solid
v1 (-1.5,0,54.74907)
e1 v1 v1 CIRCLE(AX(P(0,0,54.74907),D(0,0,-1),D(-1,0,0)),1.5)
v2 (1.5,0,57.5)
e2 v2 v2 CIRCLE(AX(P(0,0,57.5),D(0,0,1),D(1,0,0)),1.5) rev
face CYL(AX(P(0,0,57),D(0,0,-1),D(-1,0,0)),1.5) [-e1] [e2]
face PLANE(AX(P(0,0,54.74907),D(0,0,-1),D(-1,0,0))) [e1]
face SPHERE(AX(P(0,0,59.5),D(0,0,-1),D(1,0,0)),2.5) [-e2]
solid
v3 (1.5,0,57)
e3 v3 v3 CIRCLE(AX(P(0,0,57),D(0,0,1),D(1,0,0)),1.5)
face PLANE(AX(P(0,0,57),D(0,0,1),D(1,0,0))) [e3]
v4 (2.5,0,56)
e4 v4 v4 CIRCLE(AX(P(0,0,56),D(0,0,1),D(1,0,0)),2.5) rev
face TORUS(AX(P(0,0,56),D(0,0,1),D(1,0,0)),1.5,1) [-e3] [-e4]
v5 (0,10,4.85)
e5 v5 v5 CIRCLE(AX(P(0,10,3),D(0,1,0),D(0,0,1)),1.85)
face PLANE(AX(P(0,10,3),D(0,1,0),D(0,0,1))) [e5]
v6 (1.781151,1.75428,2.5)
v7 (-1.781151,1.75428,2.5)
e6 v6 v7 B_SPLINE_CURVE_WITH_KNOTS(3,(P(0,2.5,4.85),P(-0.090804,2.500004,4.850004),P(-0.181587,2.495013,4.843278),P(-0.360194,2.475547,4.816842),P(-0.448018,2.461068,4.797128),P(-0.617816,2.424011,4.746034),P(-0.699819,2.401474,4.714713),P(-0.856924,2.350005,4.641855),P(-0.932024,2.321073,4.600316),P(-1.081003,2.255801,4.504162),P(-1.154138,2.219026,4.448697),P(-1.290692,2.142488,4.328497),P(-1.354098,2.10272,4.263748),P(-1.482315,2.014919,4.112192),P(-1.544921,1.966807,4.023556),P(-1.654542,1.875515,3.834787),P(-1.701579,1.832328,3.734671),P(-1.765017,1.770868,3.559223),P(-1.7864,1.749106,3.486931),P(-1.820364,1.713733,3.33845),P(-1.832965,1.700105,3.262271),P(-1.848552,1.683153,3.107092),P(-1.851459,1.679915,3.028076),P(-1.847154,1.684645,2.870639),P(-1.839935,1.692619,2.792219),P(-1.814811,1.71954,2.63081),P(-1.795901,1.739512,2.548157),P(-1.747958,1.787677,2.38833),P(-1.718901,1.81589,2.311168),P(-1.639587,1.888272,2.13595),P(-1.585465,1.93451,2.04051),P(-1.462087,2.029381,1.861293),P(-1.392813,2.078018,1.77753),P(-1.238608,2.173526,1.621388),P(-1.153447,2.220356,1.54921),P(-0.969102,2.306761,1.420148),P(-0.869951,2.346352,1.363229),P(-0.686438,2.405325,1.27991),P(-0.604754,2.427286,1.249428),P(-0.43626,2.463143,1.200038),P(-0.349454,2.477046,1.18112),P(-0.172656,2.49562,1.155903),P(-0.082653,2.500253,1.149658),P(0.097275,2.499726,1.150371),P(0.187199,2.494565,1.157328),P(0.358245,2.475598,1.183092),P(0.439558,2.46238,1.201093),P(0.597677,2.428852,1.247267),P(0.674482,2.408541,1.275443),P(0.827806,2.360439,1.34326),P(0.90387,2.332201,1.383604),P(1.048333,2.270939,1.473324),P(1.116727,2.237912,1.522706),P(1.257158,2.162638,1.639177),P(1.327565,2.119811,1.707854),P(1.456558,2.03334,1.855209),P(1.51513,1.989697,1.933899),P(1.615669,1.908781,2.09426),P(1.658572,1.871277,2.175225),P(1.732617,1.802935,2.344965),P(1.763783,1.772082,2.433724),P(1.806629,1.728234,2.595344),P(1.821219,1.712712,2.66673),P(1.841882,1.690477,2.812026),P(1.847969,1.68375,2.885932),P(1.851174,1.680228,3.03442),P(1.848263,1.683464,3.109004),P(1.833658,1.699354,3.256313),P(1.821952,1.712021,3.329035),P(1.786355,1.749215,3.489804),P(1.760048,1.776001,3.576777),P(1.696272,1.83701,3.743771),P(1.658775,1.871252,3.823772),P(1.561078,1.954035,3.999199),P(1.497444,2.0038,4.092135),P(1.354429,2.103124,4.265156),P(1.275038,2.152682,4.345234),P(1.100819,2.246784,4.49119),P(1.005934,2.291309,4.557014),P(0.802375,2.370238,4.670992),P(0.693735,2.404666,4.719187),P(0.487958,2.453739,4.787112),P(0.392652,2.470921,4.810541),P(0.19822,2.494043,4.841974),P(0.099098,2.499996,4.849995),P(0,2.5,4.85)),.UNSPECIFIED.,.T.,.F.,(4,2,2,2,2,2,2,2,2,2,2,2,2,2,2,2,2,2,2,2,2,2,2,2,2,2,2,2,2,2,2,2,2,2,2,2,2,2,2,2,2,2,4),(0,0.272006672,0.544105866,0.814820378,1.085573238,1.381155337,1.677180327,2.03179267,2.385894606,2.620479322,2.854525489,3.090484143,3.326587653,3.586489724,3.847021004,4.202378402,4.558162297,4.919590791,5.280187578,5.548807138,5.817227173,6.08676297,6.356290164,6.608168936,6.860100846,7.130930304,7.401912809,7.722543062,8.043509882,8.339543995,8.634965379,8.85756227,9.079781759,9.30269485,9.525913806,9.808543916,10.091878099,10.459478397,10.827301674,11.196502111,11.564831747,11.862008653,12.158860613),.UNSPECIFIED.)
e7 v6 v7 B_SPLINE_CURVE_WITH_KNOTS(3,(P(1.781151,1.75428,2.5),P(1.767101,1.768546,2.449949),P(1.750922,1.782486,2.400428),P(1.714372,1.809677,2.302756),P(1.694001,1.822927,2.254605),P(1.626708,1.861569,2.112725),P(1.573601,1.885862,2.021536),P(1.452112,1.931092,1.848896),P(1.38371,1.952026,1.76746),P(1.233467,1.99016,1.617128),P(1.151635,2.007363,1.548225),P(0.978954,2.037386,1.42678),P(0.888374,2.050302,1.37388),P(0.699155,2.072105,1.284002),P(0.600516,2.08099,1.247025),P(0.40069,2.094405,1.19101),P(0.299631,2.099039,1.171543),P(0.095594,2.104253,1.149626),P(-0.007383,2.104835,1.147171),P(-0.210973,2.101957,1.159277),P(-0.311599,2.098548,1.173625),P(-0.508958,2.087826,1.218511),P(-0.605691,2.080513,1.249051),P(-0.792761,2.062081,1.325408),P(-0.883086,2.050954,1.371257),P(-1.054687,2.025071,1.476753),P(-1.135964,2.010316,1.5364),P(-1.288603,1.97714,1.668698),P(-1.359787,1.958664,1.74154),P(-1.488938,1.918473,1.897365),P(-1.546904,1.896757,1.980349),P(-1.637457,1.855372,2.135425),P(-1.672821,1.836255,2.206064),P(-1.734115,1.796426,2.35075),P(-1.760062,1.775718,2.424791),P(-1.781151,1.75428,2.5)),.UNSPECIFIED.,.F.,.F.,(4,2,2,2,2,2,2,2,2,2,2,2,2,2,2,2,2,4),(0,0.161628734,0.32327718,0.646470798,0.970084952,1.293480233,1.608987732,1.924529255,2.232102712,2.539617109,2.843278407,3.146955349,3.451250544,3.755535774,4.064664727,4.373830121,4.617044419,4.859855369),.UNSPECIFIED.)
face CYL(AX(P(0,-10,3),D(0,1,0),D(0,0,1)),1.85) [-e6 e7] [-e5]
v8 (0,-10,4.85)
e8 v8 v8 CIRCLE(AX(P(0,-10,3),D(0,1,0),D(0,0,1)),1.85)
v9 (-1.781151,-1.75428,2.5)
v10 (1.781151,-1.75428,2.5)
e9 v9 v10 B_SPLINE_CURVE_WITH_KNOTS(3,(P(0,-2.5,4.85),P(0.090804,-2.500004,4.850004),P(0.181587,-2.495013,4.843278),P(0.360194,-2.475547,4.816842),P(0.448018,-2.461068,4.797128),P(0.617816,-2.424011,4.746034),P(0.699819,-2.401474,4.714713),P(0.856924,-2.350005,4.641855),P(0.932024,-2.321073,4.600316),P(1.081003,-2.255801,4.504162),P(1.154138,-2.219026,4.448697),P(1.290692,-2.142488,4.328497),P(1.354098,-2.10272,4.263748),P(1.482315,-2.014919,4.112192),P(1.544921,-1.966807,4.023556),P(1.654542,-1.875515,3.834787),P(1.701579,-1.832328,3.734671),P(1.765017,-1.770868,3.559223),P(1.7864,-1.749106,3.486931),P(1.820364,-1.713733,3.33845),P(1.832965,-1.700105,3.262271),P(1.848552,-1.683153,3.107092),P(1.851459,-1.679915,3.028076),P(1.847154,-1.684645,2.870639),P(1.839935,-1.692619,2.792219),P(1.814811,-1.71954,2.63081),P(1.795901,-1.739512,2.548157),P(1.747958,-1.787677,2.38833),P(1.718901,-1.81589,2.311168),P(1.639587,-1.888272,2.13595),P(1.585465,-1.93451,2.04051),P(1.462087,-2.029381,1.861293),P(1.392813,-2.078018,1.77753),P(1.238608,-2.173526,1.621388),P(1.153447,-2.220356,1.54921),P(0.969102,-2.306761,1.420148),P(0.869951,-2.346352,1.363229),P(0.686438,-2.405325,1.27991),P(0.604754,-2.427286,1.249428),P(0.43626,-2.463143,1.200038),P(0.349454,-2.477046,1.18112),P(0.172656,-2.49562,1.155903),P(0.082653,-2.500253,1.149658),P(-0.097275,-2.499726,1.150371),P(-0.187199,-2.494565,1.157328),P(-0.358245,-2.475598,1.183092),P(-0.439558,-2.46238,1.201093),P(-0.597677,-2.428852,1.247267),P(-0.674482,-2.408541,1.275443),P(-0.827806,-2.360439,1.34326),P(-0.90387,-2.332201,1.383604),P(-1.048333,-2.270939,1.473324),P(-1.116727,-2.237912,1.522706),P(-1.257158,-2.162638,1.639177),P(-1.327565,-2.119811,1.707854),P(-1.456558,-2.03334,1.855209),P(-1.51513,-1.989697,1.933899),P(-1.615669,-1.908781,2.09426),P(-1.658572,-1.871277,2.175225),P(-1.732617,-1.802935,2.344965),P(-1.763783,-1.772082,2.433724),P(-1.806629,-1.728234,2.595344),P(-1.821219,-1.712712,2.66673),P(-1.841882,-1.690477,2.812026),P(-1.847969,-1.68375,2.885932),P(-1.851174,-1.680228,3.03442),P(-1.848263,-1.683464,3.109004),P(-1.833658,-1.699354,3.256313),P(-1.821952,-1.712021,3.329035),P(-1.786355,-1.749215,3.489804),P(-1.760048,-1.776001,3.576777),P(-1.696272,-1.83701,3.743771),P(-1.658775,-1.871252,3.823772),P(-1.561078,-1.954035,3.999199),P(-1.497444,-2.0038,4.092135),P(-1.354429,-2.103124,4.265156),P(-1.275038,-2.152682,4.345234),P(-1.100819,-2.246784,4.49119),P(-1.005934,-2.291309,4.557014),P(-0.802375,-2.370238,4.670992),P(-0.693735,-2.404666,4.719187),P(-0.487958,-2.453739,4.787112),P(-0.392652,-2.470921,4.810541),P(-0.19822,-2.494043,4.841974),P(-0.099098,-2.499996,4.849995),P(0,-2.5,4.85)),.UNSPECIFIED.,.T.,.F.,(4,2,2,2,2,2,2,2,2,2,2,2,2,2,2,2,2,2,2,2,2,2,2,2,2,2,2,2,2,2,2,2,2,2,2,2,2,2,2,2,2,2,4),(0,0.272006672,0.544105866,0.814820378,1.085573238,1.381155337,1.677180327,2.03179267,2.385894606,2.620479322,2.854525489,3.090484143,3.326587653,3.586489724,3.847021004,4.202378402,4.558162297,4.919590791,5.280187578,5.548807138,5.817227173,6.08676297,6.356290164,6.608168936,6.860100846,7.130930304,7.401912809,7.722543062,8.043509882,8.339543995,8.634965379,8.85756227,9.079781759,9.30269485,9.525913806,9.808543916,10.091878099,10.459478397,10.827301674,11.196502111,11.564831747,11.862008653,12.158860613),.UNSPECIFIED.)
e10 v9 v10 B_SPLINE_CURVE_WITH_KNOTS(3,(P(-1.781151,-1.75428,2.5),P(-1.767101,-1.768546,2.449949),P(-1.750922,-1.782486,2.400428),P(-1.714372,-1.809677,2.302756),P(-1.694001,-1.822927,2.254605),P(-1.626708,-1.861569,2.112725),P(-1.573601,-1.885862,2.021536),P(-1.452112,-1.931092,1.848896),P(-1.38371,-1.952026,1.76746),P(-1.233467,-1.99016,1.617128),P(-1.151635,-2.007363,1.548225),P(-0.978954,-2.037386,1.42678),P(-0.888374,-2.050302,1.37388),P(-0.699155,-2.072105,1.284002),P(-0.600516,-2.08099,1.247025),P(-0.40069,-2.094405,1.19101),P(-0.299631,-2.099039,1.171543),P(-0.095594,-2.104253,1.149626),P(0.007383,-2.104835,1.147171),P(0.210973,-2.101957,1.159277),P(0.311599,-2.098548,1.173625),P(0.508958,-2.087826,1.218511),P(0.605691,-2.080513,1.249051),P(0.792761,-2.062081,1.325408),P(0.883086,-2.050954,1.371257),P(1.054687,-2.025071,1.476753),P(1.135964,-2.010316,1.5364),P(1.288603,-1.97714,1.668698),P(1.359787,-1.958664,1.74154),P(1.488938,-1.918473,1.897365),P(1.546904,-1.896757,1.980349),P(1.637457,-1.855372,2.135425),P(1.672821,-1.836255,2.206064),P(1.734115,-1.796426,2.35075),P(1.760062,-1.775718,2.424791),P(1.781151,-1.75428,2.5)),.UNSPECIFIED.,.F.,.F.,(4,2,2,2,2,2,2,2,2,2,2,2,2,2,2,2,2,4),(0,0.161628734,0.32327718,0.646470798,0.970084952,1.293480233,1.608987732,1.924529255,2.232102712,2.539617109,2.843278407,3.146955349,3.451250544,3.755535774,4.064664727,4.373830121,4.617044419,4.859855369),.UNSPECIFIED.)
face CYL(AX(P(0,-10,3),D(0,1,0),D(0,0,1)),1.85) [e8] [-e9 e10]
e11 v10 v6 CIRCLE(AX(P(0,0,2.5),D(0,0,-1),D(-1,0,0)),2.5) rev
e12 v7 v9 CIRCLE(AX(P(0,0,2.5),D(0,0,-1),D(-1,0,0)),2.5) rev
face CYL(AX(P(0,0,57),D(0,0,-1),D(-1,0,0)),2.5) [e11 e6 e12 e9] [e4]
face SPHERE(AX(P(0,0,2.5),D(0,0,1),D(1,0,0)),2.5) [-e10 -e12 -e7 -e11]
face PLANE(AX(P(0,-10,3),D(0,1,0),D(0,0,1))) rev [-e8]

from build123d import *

# Parameters (mm, degrees)
SKETCH1_R                = 2.5
BOSS_EXTRUDE1_DEPTH      = 57
SKETCH3_W                = 1.5
SKETCH3_H                = 3.627330444
FILLET1_R                = 1
BOSS_EXTRUDE2_DEPTH      = 10
BOSS_EXTRUDE2_DEPTH_BACK = 10
SKETCH4_R                = 1.85
FILLET2_R                = 2.5


with BuildPart() as part:
    # Sketch1 → Boss-Extrude1 (new body)
    with BuildSketch(Plane.XY):
        with Locations(Location((0, 0, 0), (0, 0, 180))):
            Circle(SKETCH1_R)
    extrude(amount=BOSS_EXTRUDE1_DEPTH)

    # Fillet1
    fillet1_edges = [part.edges().sort_by_distance(p)[0] for p in [
        (2.5, 0, 57),
    ]]
    fillet(fillet1_edges, radius=FILLET1_R)

    # Sketch4 → Boss-Extrude2 (add, two sides: drawn at the far end of the back side and taken through both)
    with BuildSketch(Plane(origin=(0, 0, 0), x_dir=(1, 0, 0), z_dir=(0, 1, 0)).offset(-BOSS_EXTRUDE2_DEPTH_BACK)):
        with Locations(Location((0, -3, 0), (0, 0, 270))):
            Circle(SKETCH4_R)
    extrude(amount=BOSS_EXTRUDE2_DEPTH + BOSS_EXTRUDE2_DEPTH_BACK)

    # Fillet2
    # the kernel refuses this fillet: 2.5 mm, written as the material it takes off along each edge
    with BuildSketch(Plane(origin=(0, 0, 0), x_dir=(-1, 0, 0), z_dir=(0, 1, 0))) as fillet2_piece_1_section:
        with BuildLine():
            CenterArc((2.5 - FILLET2_R, FILLET2_R), FILLET2_R, 270, 90)
            Line((2.5 - FILLET2_R, 0), (2.5, 0))
            Line((2.5, 0), (2.5, FILLET2_R))
        make_face()
    fillet2_piece_1 = revolve(axis=Axis((0, 0, 0), (0, 0, 1)), mode=Mode.PRIVATE)
    fillet2_piece_1 = fillet2_piece_1 - Plane(origin=(0, 0, 3), x_dir=(0, 0, 1), z_dir=(0, -1, 0)) * Cylinder(1.85, 10, mode=Mode.PRIVATE)
    add(fillet2_piece_1, mode=Mode.SUBTRACT)


with BuildPart() as body_2:
    # Sketch3 → Revolve1 (revolve)
    with BuildSketch(Plane(origin=(0, 0, 0), x_dir=(1, 0, 0), z_dir=(0, 1, 0)), mode=Mode.PRIVATE) as revolve1_sk:
        with BuildLine():
            Line((0, -57), (0, -62))
            ThreePointArc((0, -62), (-2.5, -59.5), (0, -57))
        make_face()
        with Locations((-0.75, -56.562735647)):
            Rectangle(SKETCH3_W, SKETCH3_H)
    revolve(revolve1_sk.sketch.rotate(Axis((0, 0, 57), (0, 0, 1)), 180), axis=Axis((0, 0, 57), (0, 0, 1)))


solid = Compound([part.part, body_2.part])
